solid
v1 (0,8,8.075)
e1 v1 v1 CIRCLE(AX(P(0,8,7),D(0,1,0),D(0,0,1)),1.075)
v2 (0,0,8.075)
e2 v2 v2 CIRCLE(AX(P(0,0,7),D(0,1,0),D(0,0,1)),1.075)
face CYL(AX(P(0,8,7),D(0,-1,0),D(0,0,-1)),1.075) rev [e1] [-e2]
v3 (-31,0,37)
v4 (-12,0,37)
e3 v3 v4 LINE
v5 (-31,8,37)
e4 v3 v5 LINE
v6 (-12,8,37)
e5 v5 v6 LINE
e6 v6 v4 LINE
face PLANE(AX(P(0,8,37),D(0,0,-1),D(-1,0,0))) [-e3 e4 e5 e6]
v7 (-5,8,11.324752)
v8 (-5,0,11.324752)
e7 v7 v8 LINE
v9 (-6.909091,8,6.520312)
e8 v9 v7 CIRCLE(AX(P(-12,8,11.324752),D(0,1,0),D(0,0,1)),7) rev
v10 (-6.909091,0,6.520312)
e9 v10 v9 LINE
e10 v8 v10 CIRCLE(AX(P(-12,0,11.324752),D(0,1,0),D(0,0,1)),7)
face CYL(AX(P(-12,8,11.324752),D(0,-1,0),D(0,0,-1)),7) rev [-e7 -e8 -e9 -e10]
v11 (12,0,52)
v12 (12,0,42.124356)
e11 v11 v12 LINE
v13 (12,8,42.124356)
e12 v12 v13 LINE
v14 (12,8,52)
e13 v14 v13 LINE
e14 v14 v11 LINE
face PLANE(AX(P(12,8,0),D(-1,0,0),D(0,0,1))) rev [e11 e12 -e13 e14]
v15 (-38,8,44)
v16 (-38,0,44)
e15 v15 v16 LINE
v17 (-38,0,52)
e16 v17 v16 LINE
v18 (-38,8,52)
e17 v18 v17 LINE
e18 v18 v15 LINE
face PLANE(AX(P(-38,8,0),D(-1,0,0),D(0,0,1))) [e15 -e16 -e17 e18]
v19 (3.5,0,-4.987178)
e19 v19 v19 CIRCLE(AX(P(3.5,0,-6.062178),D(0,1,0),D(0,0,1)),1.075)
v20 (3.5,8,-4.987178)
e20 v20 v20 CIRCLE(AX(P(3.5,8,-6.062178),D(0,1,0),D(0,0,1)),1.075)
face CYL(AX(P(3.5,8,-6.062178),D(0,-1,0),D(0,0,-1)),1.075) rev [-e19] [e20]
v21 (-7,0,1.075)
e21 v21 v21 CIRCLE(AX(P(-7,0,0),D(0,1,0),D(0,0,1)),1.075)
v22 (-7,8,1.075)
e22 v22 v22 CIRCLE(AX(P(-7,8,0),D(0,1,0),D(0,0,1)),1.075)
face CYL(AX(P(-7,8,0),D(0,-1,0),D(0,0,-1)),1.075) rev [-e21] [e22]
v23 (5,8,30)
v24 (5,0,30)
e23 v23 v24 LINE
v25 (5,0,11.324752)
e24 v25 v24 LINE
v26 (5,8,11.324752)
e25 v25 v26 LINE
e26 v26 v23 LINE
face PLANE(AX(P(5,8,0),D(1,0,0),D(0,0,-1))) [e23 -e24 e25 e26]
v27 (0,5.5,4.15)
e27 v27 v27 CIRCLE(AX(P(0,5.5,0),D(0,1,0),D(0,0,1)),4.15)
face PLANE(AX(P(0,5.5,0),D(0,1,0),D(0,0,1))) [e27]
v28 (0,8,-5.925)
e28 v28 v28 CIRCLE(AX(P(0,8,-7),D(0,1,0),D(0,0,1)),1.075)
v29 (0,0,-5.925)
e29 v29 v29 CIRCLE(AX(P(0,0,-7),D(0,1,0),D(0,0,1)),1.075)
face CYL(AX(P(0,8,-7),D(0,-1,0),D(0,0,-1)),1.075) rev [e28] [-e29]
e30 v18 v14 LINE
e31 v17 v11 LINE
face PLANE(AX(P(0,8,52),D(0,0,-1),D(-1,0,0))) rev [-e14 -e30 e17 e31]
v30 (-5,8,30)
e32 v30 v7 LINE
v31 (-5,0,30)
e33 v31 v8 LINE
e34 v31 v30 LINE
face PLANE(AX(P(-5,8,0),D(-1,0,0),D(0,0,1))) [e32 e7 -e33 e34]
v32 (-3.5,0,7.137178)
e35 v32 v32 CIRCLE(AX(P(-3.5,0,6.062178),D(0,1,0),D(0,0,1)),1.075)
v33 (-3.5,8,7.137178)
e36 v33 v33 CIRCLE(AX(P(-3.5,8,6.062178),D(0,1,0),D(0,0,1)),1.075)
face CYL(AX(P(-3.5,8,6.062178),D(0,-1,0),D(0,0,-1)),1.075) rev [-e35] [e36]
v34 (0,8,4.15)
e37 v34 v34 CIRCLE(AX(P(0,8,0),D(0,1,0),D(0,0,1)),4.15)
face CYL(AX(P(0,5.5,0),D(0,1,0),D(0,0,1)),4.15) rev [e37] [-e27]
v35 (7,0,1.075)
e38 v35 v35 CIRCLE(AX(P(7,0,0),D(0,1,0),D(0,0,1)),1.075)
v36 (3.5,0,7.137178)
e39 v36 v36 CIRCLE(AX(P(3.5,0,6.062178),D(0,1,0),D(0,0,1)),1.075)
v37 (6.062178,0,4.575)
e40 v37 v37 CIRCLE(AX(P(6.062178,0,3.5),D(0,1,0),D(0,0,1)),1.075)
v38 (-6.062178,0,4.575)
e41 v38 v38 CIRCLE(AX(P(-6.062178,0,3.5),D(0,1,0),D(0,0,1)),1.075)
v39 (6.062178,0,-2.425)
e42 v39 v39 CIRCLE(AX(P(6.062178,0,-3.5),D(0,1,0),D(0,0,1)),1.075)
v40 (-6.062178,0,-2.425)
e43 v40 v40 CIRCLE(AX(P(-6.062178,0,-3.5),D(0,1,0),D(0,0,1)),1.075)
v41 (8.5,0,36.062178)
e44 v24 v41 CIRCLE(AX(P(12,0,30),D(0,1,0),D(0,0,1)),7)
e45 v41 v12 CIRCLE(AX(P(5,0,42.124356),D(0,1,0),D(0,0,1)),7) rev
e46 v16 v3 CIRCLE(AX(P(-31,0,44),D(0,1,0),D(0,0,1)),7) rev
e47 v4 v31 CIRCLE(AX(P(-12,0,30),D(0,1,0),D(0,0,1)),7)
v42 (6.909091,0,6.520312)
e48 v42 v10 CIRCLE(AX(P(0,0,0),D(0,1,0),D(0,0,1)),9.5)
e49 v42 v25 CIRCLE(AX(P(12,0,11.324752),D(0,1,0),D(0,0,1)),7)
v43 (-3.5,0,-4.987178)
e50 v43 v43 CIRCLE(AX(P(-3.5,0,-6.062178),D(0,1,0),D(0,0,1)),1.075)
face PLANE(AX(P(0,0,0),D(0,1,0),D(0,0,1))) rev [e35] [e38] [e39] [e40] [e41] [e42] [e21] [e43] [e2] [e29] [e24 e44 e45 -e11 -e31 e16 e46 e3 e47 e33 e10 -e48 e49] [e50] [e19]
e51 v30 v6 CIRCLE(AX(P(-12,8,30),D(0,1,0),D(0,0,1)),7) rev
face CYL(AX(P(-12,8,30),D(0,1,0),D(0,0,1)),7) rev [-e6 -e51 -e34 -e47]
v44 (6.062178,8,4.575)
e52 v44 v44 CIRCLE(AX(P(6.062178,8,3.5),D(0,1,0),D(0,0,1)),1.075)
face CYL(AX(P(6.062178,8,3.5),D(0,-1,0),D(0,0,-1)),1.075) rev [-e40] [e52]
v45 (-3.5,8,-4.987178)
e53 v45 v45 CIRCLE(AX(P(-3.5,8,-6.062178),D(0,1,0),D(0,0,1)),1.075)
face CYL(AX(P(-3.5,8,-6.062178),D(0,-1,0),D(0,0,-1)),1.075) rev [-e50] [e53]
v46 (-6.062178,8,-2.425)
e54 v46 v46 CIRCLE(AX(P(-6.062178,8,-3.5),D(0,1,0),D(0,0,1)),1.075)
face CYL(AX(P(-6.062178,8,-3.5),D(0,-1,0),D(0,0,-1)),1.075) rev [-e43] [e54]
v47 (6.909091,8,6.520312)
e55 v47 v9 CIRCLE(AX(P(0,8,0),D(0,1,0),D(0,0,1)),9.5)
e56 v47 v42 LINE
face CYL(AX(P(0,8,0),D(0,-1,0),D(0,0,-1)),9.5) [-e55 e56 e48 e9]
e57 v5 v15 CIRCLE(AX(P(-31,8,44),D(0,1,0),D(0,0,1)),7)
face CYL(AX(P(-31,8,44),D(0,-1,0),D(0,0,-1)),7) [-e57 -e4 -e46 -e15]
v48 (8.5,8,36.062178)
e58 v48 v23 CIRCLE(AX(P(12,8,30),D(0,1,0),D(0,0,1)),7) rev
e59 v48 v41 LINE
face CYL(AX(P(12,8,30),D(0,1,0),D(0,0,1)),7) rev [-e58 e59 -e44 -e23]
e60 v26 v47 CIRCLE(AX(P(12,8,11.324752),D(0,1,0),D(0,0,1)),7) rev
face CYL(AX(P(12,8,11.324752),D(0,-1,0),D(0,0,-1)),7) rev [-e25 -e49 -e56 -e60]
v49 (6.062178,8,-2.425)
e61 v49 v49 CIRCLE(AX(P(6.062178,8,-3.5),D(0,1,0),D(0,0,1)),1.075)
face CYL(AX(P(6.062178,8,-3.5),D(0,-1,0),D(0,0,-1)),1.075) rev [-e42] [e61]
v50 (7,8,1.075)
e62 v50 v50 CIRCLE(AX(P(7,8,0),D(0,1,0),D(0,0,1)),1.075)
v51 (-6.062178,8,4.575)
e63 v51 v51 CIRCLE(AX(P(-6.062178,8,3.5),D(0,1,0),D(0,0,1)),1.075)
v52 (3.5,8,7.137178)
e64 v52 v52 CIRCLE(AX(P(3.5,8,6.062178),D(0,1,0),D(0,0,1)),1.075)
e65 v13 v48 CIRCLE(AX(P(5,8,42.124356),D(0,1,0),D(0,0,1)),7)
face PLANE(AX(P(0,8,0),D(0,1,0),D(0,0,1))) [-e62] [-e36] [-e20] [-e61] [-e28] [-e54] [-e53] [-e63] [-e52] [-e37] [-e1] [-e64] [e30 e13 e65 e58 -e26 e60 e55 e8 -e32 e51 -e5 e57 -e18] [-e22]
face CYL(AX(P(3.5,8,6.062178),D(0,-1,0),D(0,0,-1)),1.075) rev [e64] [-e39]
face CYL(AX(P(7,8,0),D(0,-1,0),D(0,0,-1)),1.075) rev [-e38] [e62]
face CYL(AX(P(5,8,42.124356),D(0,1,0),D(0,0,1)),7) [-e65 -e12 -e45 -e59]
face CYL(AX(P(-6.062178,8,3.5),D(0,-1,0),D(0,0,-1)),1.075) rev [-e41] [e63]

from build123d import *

# Parameters (mm, degrees)
SKETCH1_R           = 1.075
SKETCH1_W           = 50
SKETCH1_H           = 15
BOSS_EXTRUDE1_DEPTH = 8
SKETCH2_R           = 4.15
CUT_EXTRUDE1_DEPTH  = 2.5
FILLET1_R           = 7
FILLET2_R           = 7
FILLET3_R           = 7
FILLET4_R           = 7
FILLET5_R           = 7


with BuildPart() as part:
    # Sketch1 → Boss-Extrude1 (new body)
    # profile 1 of 4: a face of its own
    with BuildSketch(Plane(origin=(0, 0, 0), x_dir=(1, 0, 0), z_dir=(0, 1, 0))):
        with BuildLine():
            Line((-5, -8.077747211), (-5, -37))
            Line((-5, -37), (5, -37))
            Line((5, -37), (5, -8.077747211))
            ThreePointArc((5, -8.077747211), (0, -9.5), (-5, -8.077747211))
        make_face()
    # profile 2 of 4: a face of its own
    with BuildSketch(Plane(origin=(0, 0, 0), x_dir=(1, 0, 0), z_dir=(0, 1, 0))):
        with BuildLine():
            Line((-5, -3.665539315), (-5, -8.077747211))
            ThreePointArc((-5, -8.077747211), (0, -9.5), (5, -8.077747211))
            Line((5, -8.077747211), (5, -3.665539315))
            ThreePointArc((5, -3.665539315), (4.987177826, -3.5), (5, -3.334460685))
            Line((5, -3.334460685), (5, 0))
            Line((5, 0), (-5, 0))
            Line((-5, 0), (-5, -3.334460685))
            ThreePointArc((-5, -3.334460685), (-4.990388163, -3.416982422), (-4.987177826, -3.5))
            ThreePointArc((-4.987177826, -3.5), (-4.990388163, -3.583017578), (-5, -3.665539315))
        make_face()
        with Locations(Location((-3.5, -6.062177826, 0), (0, 0, 270))):
            Circle(SKETCH1_R, mode=Mode.SUBTRACT)
        with Locations(Location((0, -7, 0), (0, 0, 270))):
            Circle(SKETCH1_R, mode=Mode.SUBTRACT)
        with Locations(Location((3.5, -6.062177826, 0), (0, 0, 270))):
            Circle(SKETCH1_R, mode=Mode.SUBTRACT)
    # profile 3 of 4: a face of its own
    with BuildSketch(Plane(origin=(0, 0, 0), x_dir=(1, 0, 0), z_dir=(0, 1, 0))):
        with BuildLine():
            ThreePointArc((9.5, 0), (-4.623310502, 8.299096336), (-5, -8.077747211))
            Line((-5, -8.077747211), (-5, -3.665539315))
            ThreePointArc((-5, -3.665539315), (-7.137177826, -3.5), (-5, -3.334460685))
            Line((-5, -3.334460685), (-5, 0))
            Line((-5, 0), (5, 0))
            Line((5, 0), (5, -3.334460685))
            ThreePointArc((5, -3.334460685), (6.145195405, -2.428210337), (7.137177826, -3.5))
            ThreePointArc((7.137177826, -3.5), (6.145195405, -4.571789663), (5, -3.665539315))
            Line((5, -3.665539315), (5, -8.077747211))
            ThreePointArc((5, -8.077747211), (8.299096336, -4.623310502), (9.5, 0))
        make_face()
        with Locations(Location((-7, 0, 0), (0, 0, 270))):
            Circle(SKETCH1_R, mode=Mode.SUBTRACT)
        with Locations(Location((-6.062177826, 3.5, 0), (0, 0, 270))):
            Circle(SKETCH1_R, mode=Mode.SUBTRACT)
        with Locations(Location((-3.5, 6.062177826, 0), (0, 0, 270))):
            Circle(SKETCH1_R, mode=Mode.SUBTRACT)
        with Locations(Location((7, 0, 0), (0, 0, 270))):
            Circle(SKETCH1_R, mode=Mode.SUBTRACT)
        with Locations(Location((0, 7, 0), (0, 0, 270))):
            Circle(SKETCH1_R, mode=Mode.SUBTRACT)
        with Locations(Location((3.5, 6.062177826, 0), (0, 0, 270))):
            Circle(SKETCH1_R, mode=Mode.SUBTRACT)
        with Locations(Location((6.062177826, 3.5, 0), (0, 0, 270))):
            Circle(SKETCH1_R, mode=Mode.SUBTRACT)
    # profile 4 of 4: a face of its own
    with BuildSketch(Plane(origin=(0, 0, 0), x_dir=(1, 0, 0), z_dir=(0, 1, 0))):
        with Locations((-13, -44.5)):
            Rectangle(SKETCH1_W, SKETCH1_H)
    extrude(amount=BOSS_EXTRUDE1_DEPTH)

    # Sketch2 → Cut-Extrude1 (cut)
    with BuildSketch(Plane(origin=(0, 8, 0), x_dir=(1, 0, 0), z_dir=(0, 1, 0))):
        with Locations(Location((0, 0, 0), (0, 0, 270))):
            Circle(SKETCH2_R)
    extrude(amount=-CUT_EXTRUDE1_DEPTH, mode=Mode.SUBTRACT)

    # Fillet1
    fillet1_edges = [part.edges().sort_by_distance(p)[0] for p in [
        (5, 4, 37),
    ]]
    fillet(fillet1_edges, radius=FILLET1_R - 0.0001)  # a hair under: the kernel refuses the full size

    # Fillet2
    fillet2_edges = [part.edges().sort_by_distance(p)[0] for p in [
        (-5, 4, 37),
    ]]
    fillet(fillet2_edges, radius=FILLET2_R)

    # Fillet3
    fillet3_edges = [part.edges().sort_by_distance(p)[0] for p in [
        (-5, 4, 8.077747211),
        (5, 4, 8.077747211),
    ]]
    fillet(fillet3_edges, radius=FILLET3_R)

    # Fillet4
    fillet4_edges = [part.edges().sort_by_distance(p)[0] for p in [
        (12, 4, 37),
    ]]
    fillet(fillet4_edges, radius=FILLET4_R)

    # Fillet5
    fillet5_edges = [part.edges().sort_by_distance(p)[0] for p in [
        (-38, 4, 37),
    ]]
    fillet(fillet5_edges, radius=FILLET5_R)


solid = part.part
